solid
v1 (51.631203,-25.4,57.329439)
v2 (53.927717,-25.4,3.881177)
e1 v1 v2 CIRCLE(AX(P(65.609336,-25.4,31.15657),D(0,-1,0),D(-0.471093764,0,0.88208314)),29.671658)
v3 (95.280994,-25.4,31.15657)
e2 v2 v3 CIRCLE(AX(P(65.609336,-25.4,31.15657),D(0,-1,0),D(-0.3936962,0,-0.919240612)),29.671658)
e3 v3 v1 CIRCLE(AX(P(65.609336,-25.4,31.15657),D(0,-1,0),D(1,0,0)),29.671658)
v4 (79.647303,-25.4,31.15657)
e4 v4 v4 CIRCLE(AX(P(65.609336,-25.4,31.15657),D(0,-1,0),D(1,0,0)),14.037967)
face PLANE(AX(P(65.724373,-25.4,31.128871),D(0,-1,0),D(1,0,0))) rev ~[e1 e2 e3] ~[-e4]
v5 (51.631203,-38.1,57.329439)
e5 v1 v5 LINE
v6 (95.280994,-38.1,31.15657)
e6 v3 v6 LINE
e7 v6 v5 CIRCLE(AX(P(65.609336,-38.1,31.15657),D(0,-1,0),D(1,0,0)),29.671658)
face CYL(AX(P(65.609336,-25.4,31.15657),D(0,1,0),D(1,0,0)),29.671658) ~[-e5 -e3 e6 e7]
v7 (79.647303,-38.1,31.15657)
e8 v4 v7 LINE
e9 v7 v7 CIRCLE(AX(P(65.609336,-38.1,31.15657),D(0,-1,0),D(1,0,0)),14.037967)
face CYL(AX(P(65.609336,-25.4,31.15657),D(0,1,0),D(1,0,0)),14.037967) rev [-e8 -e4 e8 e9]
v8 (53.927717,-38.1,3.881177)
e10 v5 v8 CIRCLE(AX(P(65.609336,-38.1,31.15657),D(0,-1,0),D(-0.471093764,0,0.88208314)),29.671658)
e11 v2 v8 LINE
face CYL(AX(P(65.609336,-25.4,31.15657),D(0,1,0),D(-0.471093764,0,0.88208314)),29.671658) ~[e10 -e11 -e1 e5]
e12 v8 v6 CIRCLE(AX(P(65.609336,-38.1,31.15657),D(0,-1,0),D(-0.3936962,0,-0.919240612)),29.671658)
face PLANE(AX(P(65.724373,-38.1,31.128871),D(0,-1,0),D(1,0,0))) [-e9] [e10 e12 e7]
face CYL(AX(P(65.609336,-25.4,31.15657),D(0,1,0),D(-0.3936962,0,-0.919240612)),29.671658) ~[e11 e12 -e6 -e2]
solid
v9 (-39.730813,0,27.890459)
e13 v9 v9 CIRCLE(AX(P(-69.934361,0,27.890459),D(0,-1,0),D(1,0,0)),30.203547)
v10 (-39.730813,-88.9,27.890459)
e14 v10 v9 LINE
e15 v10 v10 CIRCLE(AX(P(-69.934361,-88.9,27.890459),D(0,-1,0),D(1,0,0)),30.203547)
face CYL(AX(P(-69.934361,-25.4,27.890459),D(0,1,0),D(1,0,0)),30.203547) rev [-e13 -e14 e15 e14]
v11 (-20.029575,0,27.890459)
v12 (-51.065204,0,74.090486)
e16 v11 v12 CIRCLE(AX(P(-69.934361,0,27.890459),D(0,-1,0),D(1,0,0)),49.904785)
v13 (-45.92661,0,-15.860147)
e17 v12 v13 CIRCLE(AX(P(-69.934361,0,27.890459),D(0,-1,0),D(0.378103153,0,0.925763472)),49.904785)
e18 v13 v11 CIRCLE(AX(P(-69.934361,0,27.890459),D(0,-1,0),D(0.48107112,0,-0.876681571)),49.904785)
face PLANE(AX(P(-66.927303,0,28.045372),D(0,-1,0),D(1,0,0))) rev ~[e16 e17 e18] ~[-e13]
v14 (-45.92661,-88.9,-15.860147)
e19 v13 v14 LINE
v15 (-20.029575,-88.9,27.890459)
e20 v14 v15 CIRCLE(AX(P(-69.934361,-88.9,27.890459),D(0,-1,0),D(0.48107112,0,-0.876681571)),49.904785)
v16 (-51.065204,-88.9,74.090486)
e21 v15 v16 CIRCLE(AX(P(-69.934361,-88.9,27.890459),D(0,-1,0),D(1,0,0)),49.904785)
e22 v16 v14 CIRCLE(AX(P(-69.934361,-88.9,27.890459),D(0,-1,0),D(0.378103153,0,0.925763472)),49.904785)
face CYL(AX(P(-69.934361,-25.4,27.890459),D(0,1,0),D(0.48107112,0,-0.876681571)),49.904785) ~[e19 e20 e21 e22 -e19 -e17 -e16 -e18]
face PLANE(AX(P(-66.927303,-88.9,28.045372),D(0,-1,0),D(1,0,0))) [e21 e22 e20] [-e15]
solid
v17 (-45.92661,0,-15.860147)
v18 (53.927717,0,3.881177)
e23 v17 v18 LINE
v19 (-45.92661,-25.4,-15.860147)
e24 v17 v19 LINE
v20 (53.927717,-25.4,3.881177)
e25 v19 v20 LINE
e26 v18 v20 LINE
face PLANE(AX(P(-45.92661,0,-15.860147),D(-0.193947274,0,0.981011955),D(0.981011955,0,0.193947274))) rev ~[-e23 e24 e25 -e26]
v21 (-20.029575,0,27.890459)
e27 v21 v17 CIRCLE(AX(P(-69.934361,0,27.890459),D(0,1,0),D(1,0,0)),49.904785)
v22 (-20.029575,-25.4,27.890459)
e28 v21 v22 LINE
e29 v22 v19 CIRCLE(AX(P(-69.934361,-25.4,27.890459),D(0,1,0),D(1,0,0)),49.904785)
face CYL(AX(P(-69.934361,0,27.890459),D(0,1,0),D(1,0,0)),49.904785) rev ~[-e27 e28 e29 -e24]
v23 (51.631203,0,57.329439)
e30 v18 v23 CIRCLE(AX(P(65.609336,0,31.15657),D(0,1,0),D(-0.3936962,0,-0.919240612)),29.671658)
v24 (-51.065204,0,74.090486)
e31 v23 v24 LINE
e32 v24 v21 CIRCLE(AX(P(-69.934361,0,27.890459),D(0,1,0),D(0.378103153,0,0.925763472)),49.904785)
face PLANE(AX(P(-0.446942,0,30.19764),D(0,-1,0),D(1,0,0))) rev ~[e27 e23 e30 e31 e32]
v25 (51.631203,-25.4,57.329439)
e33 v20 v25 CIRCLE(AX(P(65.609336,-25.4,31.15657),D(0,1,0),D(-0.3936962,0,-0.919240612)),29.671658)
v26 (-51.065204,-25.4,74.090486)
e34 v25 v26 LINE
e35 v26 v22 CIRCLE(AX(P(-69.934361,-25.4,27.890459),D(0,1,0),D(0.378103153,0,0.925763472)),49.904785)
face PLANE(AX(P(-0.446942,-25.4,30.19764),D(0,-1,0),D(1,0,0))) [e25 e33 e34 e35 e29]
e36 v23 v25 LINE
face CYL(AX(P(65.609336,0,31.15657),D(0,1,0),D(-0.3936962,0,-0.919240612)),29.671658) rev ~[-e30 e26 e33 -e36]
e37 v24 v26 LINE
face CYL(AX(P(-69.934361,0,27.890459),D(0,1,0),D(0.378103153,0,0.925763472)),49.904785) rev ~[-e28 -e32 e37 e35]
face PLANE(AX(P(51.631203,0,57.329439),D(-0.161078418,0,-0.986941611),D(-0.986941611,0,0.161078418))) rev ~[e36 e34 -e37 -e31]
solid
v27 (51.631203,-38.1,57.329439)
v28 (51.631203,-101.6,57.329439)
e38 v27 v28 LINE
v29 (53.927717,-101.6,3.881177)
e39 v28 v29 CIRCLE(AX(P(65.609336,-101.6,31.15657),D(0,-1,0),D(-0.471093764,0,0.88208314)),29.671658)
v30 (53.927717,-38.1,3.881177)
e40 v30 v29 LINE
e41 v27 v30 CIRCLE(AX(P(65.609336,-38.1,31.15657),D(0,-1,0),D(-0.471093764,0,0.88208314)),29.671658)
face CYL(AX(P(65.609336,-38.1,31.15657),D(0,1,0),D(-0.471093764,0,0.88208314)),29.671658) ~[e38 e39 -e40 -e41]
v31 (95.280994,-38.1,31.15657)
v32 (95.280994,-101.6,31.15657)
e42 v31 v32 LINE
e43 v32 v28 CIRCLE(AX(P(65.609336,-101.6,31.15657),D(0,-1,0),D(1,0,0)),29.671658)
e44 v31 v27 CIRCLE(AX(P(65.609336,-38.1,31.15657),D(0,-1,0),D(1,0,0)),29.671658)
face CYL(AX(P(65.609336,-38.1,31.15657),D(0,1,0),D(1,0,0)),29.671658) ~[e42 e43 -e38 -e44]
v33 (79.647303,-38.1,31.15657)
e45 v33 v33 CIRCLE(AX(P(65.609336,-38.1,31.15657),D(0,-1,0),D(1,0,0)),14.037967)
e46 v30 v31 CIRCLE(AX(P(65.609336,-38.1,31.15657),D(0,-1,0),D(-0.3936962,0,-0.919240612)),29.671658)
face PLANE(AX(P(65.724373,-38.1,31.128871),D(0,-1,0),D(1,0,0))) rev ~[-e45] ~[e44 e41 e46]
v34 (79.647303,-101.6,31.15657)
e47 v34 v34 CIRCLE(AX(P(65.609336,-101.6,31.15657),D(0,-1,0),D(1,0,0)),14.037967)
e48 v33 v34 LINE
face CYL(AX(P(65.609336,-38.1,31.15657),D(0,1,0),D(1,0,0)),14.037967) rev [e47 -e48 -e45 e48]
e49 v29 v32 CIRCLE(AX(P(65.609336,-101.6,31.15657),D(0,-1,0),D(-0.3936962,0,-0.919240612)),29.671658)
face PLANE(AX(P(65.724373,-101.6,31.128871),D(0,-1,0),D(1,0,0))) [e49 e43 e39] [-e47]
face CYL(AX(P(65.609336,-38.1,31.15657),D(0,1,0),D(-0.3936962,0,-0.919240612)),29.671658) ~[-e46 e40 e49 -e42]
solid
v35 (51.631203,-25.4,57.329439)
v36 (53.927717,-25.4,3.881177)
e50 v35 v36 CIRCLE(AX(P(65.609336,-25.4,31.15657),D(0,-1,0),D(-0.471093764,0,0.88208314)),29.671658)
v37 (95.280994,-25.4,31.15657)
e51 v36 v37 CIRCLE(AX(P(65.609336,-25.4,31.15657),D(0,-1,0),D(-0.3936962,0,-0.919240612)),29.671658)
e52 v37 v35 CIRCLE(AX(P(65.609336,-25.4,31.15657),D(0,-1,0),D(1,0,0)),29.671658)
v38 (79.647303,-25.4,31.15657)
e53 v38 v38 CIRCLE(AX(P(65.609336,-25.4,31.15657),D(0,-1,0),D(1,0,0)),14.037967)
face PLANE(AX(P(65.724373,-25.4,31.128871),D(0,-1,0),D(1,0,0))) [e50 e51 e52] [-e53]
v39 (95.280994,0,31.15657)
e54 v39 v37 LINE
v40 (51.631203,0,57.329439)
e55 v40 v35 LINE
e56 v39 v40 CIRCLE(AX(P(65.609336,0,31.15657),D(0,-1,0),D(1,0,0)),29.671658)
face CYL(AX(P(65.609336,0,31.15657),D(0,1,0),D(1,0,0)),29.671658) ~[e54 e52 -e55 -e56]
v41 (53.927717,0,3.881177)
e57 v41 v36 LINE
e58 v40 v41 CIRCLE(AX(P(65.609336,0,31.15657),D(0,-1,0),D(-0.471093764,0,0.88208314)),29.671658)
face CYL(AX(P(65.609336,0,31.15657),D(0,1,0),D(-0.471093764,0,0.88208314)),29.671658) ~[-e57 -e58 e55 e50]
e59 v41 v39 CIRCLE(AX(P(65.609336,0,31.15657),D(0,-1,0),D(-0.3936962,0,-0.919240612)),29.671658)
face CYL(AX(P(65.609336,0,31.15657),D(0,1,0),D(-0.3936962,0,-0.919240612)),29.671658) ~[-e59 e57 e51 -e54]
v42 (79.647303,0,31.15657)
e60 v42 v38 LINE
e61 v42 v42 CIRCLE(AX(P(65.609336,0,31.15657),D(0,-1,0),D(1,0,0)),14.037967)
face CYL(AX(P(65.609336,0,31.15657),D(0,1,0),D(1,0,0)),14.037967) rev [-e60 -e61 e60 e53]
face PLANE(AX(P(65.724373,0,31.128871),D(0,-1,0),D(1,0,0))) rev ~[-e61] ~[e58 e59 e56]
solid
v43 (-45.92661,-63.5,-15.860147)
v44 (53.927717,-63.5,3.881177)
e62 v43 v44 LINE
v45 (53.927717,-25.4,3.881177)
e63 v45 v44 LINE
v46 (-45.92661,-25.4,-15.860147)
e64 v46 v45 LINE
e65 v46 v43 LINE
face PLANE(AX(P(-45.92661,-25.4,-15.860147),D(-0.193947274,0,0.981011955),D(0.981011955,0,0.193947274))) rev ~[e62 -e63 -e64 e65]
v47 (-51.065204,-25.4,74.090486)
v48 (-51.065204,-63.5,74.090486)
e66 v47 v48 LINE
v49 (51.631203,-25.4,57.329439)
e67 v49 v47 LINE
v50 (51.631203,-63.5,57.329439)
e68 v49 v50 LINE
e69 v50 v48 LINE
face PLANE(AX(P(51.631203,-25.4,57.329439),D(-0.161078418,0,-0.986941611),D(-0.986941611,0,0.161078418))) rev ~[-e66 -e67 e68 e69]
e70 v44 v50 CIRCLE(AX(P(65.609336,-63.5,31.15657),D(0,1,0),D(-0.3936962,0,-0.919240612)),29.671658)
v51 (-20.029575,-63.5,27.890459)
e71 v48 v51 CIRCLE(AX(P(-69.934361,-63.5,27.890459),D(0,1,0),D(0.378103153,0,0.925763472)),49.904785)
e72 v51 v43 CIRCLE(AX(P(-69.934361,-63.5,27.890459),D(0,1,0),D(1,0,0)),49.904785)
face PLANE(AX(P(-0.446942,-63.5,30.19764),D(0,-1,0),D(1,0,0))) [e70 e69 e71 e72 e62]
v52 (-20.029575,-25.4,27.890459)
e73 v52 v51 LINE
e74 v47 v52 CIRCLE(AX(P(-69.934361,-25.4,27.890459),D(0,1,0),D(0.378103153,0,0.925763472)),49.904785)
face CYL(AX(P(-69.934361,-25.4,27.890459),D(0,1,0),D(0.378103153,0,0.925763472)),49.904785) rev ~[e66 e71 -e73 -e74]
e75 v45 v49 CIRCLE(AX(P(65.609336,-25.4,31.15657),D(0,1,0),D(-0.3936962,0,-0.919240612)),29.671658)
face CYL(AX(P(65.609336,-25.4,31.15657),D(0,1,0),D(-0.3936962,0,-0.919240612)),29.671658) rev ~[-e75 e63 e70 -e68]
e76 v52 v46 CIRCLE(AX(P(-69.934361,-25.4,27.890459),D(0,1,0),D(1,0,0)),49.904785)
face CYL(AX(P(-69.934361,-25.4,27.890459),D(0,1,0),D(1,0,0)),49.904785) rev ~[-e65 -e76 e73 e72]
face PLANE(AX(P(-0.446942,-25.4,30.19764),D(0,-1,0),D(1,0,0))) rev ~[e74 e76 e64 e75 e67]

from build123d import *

# Parameters (mm, degrees)
F0_R     = 14.0379672149
F2_DEPTH = 25.4
F0_R_2   = 30.2035472703
F4_DEPTH = 63.5
F5_DEPTH = 38.1
F6_DEPTH = 12.7
F7_DEPTH = 63.5


with BuildPart() as f2:
    # F0 (on Front) → F2 (new body)
    with BuildSketch(Plane.XZ):
        with BuildLine():
            ThreePointArc((95.2809938719, 31.1565697193), (80.867987619, 56.6041793229), (51.6312028736, 57.3294389535))
            ThreePointArc((51.6312028736, 57.3294389535), (35.965029482, 29.8828413836), (53.9277169218, 3.88117669))
            ThreePointArc((53.9277169218, 3.88117669), (81.9463228304, 6.3874327773), (95.2809938719, 31.1565697193))
        make_face()
        with Locations((65.6093358994, 31.1565697193)):
            Circle(F0_R, mode=Mode.SUBTRACT)
    extrude(amount=F2_DEPTH)


with BuildPart() as f2b:
    # F0 (on Front) → F2, piece 2 (new body)
    with BuildSketch(Plane.XZ):
        with BuildLine():
            ThreePointArc((-45.9266097252, -15.8601469004), (-26.9891091759, 2.4701327863), (-20.0295753742, 27.890458703))
            ThreePointArc((-20.0295753742, 27.890458703), (-28.508832265, 55.7187391388), (-51.0652040106, 74.0904860103))
            ThreePointArc((-51.0652040106, 74.0904860103), (-119.7579132685, 25.0441972115), (-45.9266097252, -15.8601469004))
        make_face()
        with Locations((-69.934360683, 27.890458703)):
            Circle(F0_R_2, mode=Mode.SUBTRACT)
    extrude(amount=F2_DEPTH)

    # F4 (add): a face of the model
    f4_faces = [f2b.faces().sort_by_distance(p)[0] for p in [
        (-93.2630699006, -25.4, 70.4036103104),
    ]]
    extrude(f4_faces, amount=F4_DEPTH)


with BuildPart() as f2c:
    # F1 (on face) → F2, piece 3 (new body)
    with BuildSketch(Plane.XZ):
        with BuildLine():
            Line((51.6312028736, 57.3294389535), (-51.0652040106, 74.0904860103))
            ThreePointArc((-51.0652040106, 74.0904860103), (-28.508832265, 55.7187391388), (-20.0295753742, 27.890458703))
            ThreePointArc((-20.0295753742, 27.890458703), (-26.9891091759, 2.4701327863), (-45.9266097252, -15.8601469004))
            Line((-45.9266097252, -15.8601469004), (53.9277169218, 3.88117669))
            ThreePointArc((53.9277169218, 3.88117669), (35.965029482, 29.8828413836), (51.6312028736, 57.3294389535))
        make_face()
    extrude(amount=F2_DEPTH)


with BuildPart() as f5:
    # F5 (new): a face of the model
    f5_faces = [f2c.part.faces().sort_by_distance(p)[0] for p in [
        (4.6663814886, -25.4, 29.8185425635),
    ]]
    extrude(f5_faces, amount=F5_DEPTH)


with BuildPart() as f6:
    # F6 (new): a face of the model
    f6_faces = [f2.part.faces().sort_by_distance(p)[0] for p in [
        (76.9605487971, -25.4, 57.6604981338),
    ]]
    extrude(f6_faces, amount=F6_DEPTH)


with BuildPart() as f7:
    # F7 (new): a face of the model
    f7_faces = [f6.part.faces().sort_by_distance(p)[0] for p in [
        (76.9605487971, -38.1, 57.6604981338),
    ]]
    extrude(f7_faces, amount=F7_DEPTH)


solid = Compound([f2.part, f2b.part, f2c.part, f5.part, f6.part, f7.part])
